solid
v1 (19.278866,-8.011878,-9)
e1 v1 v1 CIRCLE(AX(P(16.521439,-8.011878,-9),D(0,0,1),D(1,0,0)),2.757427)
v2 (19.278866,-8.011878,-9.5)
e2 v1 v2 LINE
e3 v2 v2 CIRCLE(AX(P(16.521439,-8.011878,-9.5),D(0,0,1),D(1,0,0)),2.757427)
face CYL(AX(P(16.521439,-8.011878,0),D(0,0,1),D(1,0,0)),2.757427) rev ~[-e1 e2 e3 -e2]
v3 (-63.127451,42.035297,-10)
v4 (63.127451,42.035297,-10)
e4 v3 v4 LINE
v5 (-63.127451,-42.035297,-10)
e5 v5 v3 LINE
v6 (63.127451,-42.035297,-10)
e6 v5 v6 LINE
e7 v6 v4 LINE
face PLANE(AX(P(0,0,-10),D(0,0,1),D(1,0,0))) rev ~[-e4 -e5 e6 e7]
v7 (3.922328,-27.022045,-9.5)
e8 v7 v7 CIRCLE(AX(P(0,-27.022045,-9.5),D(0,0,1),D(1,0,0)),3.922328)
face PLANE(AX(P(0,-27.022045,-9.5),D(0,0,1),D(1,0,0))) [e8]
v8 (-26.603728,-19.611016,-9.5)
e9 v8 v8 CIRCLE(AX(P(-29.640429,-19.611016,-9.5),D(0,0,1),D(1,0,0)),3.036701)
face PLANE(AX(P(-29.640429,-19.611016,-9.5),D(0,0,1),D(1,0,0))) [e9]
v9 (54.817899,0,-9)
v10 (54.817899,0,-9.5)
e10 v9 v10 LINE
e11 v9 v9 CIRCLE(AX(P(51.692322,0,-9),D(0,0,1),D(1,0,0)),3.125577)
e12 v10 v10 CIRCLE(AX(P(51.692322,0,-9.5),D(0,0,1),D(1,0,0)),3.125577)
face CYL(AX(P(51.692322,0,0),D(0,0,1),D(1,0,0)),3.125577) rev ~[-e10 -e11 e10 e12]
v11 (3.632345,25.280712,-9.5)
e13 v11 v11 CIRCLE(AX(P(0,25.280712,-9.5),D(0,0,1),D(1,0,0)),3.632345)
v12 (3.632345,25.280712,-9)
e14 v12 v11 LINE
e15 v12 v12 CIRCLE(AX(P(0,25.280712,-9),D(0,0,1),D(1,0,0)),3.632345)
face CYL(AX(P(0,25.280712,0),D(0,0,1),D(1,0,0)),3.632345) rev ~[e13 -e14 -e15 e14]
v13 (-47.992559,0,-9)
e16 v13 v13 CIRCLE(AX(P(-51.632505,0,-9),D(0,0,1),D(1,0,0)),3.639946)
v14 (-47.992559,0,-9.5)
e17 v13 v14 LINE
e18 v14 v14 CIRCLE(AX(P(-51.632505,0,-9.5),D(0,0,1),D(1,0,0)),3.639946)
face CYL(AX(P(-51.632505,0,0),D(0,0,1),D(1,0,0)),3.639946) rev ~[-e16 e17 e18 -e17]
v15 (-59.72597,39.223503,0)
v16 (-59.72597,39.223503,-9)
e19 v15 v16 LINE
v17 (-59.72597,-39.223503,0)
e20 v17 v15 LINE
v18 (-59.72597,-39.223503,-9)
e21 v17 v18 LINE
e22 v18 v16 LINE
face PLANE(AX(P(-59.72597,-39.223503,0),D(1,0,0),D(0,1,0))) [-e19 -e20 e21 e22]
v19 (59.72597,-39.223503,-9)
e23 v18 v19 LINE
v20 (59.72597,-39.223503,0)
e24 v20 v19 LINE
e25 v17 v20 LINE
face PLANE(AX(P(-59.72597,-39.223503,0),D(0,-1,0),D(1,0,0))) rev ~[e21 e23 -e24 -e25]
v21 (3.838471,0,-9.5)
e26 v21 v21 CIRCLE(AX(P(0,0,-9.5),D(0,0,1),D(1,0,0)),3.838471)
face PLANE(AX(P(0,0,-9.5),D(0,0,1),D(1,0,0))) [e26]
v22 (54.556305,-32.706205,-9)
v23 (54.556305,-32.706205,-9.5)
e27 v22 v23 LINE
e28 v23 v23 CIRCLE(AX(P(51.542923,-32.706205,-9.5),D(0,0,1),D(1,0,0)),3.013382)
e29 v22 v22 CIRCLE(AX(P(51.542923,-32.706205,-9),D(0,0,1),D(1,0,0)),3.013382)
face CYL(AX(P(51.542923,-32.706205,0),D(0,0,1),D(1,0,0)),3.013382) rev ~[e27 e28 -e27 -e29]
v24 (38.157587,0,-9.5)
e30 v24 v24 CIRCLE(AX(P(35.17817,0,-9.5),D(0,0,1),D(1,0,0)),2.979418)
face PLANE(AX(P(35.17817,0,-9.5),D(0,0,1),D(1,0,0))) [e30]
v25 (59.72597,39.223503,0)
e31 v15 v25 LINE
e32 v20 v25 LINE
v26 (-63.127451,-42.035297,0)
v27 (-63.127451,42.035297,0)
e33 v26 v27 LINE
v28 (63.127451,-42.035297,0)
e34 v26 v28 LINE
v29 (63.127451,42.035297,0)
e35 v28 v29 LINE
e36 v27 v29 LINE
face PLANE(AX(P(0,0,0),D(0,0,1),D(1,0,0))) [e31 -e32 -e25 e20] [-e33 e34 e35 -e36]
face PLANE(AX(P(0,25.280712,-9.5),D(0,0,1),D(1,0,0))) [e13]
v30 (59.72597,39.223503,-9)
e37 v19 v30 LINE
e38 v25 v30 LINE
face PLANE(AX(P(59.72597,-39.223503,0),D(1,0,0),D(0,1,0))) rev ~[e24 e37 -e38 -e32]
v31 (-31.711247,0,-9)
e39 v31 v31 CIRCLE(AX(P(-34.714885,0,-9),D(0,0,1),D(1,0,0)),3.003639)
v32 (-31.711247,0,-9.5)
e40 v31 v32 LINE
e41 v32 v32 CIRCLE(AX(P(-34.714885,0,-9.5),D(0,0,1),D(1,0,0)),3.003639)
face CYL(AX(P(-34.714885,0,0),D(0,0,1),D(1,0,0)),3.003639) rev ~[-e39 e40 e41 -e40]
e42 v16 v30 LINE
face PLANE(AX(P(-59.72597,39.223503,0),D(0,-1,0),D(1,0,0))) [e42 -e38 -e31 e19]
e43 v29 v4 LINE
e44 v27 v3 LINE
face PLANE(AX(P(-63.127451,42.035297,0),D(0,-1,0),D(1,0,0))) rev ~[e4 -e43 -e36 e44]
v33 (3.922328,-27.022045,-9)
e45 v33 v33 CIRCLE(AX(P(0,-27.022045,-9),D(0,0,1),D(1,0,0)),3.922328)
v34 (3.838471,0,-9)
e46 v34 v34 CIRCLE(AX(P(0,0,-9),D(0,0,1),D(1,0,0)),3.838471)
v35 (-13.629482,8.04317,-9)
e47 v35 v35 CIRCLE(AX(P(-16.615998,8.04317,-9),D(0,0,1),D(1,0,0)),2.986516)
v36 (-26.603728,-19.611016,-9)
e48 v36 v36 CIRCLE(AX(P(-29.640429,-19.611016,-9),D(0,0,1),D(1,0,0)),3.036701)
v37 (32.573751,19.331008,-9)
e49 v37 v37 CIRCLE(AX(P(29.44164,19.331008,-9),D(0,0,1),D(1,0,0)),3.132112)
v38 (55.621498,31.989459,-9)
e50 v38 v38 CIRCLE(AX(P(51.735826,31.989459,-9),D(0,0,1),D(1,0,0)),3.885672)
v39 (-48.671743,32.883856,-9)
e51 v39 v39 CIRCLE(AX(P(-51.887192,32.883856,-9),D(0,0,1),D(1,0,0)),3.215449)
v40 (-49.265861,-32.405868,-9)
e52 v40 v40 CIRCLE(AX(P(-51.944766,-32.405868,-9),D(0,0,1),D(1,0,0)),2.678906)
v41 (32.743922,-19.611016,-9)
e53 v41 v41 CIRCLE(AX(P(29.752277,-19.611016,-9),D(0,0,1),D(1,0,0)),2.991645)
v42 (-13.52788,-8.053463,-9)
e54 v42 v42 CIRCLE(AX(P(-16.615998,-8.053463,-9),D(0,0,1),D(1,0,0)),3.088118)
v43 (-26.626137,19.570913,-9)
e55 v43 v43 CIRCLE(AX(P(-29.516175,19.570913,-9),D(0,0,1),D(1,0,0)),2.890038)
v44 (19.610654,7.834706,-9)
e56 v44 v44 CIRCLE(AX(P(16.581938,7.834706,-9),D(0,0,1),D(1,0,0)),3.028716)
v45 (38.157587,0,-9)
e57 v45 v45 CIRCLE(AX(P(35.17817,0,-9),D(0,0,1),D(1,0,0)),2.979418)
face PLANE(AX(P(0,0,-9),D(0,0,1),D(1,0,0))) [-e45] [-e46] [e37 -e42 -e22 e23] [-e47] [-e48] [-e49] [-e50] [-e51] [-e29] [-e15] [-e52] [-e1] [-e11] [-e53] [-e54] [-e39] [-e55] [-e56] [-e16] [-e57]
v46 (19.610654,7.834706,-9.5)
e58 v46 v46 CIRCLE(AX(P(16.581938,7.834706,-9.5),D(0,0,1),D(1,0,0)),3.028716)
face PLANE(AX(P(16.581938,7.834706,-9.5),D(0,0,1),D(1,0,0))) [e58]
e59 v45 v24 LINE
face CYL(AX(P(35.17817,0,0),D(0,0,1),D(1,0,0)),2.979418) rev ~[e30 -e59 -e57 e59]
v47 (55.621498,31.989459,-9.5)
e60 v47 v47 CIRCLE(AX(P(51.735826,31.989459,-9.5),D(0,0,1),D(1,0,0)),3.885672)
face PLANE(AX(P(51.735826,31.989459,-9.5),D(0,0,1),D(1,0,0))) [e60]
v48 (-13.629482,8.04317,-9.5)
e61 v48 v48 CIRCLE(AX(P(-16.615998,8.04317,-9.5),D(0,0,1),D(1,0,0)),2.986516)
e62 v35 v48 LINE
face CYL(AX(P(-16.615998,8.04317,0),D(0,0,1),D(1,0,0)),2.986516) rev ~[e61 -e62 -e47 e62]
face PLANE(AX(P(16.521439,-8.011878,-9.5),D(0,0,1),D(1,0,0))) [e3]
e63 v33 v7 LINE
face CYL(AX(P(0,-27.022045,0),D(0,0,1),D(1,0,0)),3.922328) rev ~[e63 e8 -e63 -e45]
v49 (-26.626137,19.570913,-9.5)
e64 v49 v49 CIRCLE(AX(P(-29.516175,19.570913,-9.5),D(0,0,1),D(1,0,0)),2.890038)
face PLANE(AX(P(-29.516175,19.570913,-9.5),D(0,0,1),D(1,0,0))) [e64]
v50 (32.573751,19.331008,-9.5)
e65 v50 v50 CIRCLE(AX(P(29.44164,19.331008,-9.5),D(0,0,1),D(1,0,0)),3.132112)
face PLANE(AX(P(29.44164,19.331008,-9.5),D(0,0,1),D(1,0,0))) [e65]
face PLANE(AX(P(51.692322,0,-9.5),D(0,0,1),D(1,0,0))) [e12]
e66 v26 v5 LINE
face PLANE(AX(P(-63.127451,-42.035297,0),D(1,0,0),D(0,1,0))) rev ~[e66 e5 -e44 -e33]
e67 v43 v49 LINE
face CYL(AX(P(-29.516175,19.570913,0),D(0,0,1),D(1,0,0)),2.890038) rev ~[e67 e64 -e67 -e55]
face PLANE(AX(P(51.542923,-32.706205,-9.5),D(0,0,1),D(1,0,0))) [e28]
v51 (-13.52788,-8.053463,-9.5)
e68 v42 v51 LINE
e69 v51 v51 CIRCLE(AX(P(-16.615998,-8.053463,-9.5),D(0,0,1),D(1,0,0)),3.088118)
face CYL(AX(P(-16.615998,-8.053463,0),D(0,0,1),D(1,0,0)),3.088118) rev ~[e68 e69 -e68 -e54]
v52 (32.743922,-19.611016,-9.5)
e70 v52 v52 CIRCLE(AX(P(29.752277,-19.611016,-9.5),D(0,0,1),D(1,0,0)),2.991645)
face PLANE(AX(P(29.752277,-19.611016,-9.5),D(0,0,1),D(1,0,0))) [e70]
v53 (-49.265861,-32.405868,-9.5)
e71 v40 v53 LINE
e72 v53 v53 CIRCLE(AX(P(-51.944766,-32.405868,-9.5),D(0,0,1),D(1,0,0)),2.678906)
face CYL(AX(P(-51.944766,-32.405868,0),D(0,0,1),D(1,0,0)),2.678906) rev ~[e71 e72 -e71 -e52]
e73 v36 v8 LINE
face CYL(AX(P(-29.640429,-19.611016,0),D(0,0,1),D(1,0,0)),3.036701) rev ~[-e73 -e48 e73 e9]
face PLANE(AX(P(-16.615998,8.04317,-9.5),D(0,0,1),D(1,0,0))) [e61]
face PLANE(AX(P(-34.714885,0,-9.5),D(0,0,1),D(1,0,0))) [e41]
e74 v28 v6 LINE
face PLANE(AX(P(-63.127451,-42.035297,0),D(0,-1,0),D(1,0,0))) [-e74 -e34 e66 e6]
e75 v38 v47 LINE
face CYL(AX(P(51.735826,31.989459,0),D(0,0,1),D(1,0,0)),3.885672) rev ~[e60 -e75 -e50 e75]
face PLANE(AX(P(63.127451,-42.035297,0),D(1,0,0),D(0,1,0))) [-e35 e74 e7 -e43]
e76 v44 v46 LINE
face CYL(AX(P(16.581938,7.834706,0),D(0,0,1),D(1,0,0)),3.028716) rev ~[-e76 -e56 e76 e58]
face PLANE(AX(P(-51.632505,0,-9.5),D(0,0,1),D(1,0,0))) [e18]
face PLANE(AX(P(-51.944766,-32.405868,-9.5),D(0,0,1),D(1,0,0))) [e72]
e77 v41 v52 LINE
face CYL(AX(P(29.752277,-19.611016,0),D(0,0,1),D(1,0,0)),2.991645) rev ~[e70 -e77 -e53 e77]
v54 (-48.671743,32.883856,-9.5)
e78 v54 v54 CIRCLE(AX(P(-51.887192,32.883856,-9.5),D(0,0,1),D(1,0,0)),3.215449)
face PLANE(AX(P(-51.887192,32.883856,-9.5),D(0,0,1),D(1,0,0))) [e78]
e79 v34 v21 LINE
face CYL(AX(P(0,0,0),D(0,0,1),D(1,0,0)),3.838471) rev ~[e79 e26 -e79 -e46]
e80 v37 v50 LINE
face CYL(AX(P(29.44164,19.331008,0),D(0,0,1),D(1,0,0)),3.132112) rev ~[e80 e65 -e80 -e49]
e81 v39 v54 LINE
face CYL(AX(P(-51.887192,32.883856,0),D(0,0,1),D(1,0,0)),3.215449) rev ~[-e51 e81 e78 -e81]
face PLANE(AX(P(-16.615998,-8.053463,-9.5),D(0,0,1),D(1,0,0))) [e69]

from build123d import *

# Parameters (mm, degrees)
F0_W      = 126.2549012899
F0_H      = 84.0705931187
F1_DEPTH  = 10
F2_W      = 119.4519400597
F2_H      = 78.4470066428
F3_DEPTH  = 9
F6_R      = 2.7574274492
F6_R_2    = 3.0881184617
F6_R_3    = 2.9865161703
F7_DEPTH  = 9.5
F5_R      = 3.0287162896
F8_DEPTH  = 9.5
F4_R      = 3.8384708655
F9_DEPTH  = 9.5
F10_R     = 3.132111717
F10_R_2   = 2.9916448853
F10_R_3   = 3.0367007185
F10_R_4   = 2.8900379759
F11_DEPTH = 9.5
F13_R     = 3.0036385534
F13_R_2   = 2.9794176667
F13_R_3   = 3.6399459422
F13_R_4   = 3.1255773117
F14_DEPTH = 9.5
F12_R     = 3.2154485225
F12_R_2   = 2.6789056155
F12_R_3   = 3.0133824395
F12_R_4   = 3.8856724273
F15_DEPTH = 9.5
F16_R     = 3.6323450942
F16_R_2   = 3.9223279678
F17_DEPTH = 9.5


# Not quite as in the source:
# - a feature names something its author has since deleted; it is built from what else it names


with BuildPart() as f1:
    # F0 (on Top) → F1 (new body)
    with BuildSketch(Plane.XY):
        Rectangle(F0_W, F0_H)
    extrude(amount=-F1_DEPTH)

    # F2 (on Top) → F3 (cut)
    with BuildSketch(Plane.XY):
        Rectangle(F2_W, F2_H)
    extrude(amount=-F3_DEPTH, mode=Mode.SUBTRACT)

    # F6 (on Top) → F7 (cut)
    with BuildSketch(Plane.XY):
        with Locations((16.5214389563, -8.0118775368)):
            Circle(F6_R)
        with Locations((-16.615998, -8.0534629524)):
            Circle(F6_R_2)
        with Locations((-16.615998, 8.0431699753)):
            Circle(F6_R_3)
    extrude(amount=-F7_DEPTH, mode=Mode.SUBTRACT)

    # F5 (on Top) → F8 (cut)
    with BuildSketch(Plane.XY):
        with Locations((16.5819376707, 7.8347064555)):
            Circle(F5_R)
    extrude(amount=-F8_DEPTH, mode=Mode.SUBTRACT)

    # F4 (on Top) → F9 (cut)
    with BuildSketch(Plane.XY):
        Circle(F4_R)
    extrude(amount=-F9_DEPTH, mode=Mode.SUBTRACT)

    # F10 (on face) → F11 (cut)
    with BuildSketch(Plane.XY):
        with Locations((29.441639781, 19.3310081959)):
            Circle(F10_R)
        with Locations((29.7522768378, -19.6110159159)):
            Circle(F10_R_2)
        with Locations((-29.6404287219, -19.6110159159)):
            Circle(F10_R_3)
        with Locations((-29.5161753893, 19.5709131658)):
            Circle(F10_R_4)
    extrude(amount=-F11_DEPTH, mode=Mode.SUBTRACT)

    # F13 (on Top) → F14 (cut)
    with BuildSketch(Plane.XY):
        with Locations((-34.714885056, 0)):
            Circle(F13_R)
        with Locations((35.1781696081, 0)):
            Circle(F13_R_2)
        with Locations((-51.6325049102, 0)):
            Circle(F13_R_3)
        with Locations((51.6923218966, 0)):
            Circle(F13_R_4)
    extrude(amount=-F14_DEPTH, mode=Mode.SUBTRACT)

    # F12 (on Top) → F15 (cut)
    with BuildSketch(Plane.XY):
        with Locations((-51.8871918321, 32.8838564456)):
            Circle(F12_R)
        with Locations((-51.9447661936, -32.4058681726)):
            Circle(F12_R_2)
        with Locations((51.5429228544, -32.7062048018)):
            Circle(F12_R_3)
        with Locations((51.7358258367, 31.9894589484)):
            Circle(F12_R_4)
    extrude(amount=-F15_DEPTH, mode=Mode.SUBTRACT)

    # F16 (on Top) → F17 (cut)
    with BuildSketch(Plane.XY):
        with Locations((0, 25.2807121724)):
            Circle(F16_R)
        with Locations((0, -27.0220451057)):
            Circle(F16_R_2)
    extrude(amount=-F17_DEPTH, mode=Mode.SUBTRACT)


solid = f1.part
